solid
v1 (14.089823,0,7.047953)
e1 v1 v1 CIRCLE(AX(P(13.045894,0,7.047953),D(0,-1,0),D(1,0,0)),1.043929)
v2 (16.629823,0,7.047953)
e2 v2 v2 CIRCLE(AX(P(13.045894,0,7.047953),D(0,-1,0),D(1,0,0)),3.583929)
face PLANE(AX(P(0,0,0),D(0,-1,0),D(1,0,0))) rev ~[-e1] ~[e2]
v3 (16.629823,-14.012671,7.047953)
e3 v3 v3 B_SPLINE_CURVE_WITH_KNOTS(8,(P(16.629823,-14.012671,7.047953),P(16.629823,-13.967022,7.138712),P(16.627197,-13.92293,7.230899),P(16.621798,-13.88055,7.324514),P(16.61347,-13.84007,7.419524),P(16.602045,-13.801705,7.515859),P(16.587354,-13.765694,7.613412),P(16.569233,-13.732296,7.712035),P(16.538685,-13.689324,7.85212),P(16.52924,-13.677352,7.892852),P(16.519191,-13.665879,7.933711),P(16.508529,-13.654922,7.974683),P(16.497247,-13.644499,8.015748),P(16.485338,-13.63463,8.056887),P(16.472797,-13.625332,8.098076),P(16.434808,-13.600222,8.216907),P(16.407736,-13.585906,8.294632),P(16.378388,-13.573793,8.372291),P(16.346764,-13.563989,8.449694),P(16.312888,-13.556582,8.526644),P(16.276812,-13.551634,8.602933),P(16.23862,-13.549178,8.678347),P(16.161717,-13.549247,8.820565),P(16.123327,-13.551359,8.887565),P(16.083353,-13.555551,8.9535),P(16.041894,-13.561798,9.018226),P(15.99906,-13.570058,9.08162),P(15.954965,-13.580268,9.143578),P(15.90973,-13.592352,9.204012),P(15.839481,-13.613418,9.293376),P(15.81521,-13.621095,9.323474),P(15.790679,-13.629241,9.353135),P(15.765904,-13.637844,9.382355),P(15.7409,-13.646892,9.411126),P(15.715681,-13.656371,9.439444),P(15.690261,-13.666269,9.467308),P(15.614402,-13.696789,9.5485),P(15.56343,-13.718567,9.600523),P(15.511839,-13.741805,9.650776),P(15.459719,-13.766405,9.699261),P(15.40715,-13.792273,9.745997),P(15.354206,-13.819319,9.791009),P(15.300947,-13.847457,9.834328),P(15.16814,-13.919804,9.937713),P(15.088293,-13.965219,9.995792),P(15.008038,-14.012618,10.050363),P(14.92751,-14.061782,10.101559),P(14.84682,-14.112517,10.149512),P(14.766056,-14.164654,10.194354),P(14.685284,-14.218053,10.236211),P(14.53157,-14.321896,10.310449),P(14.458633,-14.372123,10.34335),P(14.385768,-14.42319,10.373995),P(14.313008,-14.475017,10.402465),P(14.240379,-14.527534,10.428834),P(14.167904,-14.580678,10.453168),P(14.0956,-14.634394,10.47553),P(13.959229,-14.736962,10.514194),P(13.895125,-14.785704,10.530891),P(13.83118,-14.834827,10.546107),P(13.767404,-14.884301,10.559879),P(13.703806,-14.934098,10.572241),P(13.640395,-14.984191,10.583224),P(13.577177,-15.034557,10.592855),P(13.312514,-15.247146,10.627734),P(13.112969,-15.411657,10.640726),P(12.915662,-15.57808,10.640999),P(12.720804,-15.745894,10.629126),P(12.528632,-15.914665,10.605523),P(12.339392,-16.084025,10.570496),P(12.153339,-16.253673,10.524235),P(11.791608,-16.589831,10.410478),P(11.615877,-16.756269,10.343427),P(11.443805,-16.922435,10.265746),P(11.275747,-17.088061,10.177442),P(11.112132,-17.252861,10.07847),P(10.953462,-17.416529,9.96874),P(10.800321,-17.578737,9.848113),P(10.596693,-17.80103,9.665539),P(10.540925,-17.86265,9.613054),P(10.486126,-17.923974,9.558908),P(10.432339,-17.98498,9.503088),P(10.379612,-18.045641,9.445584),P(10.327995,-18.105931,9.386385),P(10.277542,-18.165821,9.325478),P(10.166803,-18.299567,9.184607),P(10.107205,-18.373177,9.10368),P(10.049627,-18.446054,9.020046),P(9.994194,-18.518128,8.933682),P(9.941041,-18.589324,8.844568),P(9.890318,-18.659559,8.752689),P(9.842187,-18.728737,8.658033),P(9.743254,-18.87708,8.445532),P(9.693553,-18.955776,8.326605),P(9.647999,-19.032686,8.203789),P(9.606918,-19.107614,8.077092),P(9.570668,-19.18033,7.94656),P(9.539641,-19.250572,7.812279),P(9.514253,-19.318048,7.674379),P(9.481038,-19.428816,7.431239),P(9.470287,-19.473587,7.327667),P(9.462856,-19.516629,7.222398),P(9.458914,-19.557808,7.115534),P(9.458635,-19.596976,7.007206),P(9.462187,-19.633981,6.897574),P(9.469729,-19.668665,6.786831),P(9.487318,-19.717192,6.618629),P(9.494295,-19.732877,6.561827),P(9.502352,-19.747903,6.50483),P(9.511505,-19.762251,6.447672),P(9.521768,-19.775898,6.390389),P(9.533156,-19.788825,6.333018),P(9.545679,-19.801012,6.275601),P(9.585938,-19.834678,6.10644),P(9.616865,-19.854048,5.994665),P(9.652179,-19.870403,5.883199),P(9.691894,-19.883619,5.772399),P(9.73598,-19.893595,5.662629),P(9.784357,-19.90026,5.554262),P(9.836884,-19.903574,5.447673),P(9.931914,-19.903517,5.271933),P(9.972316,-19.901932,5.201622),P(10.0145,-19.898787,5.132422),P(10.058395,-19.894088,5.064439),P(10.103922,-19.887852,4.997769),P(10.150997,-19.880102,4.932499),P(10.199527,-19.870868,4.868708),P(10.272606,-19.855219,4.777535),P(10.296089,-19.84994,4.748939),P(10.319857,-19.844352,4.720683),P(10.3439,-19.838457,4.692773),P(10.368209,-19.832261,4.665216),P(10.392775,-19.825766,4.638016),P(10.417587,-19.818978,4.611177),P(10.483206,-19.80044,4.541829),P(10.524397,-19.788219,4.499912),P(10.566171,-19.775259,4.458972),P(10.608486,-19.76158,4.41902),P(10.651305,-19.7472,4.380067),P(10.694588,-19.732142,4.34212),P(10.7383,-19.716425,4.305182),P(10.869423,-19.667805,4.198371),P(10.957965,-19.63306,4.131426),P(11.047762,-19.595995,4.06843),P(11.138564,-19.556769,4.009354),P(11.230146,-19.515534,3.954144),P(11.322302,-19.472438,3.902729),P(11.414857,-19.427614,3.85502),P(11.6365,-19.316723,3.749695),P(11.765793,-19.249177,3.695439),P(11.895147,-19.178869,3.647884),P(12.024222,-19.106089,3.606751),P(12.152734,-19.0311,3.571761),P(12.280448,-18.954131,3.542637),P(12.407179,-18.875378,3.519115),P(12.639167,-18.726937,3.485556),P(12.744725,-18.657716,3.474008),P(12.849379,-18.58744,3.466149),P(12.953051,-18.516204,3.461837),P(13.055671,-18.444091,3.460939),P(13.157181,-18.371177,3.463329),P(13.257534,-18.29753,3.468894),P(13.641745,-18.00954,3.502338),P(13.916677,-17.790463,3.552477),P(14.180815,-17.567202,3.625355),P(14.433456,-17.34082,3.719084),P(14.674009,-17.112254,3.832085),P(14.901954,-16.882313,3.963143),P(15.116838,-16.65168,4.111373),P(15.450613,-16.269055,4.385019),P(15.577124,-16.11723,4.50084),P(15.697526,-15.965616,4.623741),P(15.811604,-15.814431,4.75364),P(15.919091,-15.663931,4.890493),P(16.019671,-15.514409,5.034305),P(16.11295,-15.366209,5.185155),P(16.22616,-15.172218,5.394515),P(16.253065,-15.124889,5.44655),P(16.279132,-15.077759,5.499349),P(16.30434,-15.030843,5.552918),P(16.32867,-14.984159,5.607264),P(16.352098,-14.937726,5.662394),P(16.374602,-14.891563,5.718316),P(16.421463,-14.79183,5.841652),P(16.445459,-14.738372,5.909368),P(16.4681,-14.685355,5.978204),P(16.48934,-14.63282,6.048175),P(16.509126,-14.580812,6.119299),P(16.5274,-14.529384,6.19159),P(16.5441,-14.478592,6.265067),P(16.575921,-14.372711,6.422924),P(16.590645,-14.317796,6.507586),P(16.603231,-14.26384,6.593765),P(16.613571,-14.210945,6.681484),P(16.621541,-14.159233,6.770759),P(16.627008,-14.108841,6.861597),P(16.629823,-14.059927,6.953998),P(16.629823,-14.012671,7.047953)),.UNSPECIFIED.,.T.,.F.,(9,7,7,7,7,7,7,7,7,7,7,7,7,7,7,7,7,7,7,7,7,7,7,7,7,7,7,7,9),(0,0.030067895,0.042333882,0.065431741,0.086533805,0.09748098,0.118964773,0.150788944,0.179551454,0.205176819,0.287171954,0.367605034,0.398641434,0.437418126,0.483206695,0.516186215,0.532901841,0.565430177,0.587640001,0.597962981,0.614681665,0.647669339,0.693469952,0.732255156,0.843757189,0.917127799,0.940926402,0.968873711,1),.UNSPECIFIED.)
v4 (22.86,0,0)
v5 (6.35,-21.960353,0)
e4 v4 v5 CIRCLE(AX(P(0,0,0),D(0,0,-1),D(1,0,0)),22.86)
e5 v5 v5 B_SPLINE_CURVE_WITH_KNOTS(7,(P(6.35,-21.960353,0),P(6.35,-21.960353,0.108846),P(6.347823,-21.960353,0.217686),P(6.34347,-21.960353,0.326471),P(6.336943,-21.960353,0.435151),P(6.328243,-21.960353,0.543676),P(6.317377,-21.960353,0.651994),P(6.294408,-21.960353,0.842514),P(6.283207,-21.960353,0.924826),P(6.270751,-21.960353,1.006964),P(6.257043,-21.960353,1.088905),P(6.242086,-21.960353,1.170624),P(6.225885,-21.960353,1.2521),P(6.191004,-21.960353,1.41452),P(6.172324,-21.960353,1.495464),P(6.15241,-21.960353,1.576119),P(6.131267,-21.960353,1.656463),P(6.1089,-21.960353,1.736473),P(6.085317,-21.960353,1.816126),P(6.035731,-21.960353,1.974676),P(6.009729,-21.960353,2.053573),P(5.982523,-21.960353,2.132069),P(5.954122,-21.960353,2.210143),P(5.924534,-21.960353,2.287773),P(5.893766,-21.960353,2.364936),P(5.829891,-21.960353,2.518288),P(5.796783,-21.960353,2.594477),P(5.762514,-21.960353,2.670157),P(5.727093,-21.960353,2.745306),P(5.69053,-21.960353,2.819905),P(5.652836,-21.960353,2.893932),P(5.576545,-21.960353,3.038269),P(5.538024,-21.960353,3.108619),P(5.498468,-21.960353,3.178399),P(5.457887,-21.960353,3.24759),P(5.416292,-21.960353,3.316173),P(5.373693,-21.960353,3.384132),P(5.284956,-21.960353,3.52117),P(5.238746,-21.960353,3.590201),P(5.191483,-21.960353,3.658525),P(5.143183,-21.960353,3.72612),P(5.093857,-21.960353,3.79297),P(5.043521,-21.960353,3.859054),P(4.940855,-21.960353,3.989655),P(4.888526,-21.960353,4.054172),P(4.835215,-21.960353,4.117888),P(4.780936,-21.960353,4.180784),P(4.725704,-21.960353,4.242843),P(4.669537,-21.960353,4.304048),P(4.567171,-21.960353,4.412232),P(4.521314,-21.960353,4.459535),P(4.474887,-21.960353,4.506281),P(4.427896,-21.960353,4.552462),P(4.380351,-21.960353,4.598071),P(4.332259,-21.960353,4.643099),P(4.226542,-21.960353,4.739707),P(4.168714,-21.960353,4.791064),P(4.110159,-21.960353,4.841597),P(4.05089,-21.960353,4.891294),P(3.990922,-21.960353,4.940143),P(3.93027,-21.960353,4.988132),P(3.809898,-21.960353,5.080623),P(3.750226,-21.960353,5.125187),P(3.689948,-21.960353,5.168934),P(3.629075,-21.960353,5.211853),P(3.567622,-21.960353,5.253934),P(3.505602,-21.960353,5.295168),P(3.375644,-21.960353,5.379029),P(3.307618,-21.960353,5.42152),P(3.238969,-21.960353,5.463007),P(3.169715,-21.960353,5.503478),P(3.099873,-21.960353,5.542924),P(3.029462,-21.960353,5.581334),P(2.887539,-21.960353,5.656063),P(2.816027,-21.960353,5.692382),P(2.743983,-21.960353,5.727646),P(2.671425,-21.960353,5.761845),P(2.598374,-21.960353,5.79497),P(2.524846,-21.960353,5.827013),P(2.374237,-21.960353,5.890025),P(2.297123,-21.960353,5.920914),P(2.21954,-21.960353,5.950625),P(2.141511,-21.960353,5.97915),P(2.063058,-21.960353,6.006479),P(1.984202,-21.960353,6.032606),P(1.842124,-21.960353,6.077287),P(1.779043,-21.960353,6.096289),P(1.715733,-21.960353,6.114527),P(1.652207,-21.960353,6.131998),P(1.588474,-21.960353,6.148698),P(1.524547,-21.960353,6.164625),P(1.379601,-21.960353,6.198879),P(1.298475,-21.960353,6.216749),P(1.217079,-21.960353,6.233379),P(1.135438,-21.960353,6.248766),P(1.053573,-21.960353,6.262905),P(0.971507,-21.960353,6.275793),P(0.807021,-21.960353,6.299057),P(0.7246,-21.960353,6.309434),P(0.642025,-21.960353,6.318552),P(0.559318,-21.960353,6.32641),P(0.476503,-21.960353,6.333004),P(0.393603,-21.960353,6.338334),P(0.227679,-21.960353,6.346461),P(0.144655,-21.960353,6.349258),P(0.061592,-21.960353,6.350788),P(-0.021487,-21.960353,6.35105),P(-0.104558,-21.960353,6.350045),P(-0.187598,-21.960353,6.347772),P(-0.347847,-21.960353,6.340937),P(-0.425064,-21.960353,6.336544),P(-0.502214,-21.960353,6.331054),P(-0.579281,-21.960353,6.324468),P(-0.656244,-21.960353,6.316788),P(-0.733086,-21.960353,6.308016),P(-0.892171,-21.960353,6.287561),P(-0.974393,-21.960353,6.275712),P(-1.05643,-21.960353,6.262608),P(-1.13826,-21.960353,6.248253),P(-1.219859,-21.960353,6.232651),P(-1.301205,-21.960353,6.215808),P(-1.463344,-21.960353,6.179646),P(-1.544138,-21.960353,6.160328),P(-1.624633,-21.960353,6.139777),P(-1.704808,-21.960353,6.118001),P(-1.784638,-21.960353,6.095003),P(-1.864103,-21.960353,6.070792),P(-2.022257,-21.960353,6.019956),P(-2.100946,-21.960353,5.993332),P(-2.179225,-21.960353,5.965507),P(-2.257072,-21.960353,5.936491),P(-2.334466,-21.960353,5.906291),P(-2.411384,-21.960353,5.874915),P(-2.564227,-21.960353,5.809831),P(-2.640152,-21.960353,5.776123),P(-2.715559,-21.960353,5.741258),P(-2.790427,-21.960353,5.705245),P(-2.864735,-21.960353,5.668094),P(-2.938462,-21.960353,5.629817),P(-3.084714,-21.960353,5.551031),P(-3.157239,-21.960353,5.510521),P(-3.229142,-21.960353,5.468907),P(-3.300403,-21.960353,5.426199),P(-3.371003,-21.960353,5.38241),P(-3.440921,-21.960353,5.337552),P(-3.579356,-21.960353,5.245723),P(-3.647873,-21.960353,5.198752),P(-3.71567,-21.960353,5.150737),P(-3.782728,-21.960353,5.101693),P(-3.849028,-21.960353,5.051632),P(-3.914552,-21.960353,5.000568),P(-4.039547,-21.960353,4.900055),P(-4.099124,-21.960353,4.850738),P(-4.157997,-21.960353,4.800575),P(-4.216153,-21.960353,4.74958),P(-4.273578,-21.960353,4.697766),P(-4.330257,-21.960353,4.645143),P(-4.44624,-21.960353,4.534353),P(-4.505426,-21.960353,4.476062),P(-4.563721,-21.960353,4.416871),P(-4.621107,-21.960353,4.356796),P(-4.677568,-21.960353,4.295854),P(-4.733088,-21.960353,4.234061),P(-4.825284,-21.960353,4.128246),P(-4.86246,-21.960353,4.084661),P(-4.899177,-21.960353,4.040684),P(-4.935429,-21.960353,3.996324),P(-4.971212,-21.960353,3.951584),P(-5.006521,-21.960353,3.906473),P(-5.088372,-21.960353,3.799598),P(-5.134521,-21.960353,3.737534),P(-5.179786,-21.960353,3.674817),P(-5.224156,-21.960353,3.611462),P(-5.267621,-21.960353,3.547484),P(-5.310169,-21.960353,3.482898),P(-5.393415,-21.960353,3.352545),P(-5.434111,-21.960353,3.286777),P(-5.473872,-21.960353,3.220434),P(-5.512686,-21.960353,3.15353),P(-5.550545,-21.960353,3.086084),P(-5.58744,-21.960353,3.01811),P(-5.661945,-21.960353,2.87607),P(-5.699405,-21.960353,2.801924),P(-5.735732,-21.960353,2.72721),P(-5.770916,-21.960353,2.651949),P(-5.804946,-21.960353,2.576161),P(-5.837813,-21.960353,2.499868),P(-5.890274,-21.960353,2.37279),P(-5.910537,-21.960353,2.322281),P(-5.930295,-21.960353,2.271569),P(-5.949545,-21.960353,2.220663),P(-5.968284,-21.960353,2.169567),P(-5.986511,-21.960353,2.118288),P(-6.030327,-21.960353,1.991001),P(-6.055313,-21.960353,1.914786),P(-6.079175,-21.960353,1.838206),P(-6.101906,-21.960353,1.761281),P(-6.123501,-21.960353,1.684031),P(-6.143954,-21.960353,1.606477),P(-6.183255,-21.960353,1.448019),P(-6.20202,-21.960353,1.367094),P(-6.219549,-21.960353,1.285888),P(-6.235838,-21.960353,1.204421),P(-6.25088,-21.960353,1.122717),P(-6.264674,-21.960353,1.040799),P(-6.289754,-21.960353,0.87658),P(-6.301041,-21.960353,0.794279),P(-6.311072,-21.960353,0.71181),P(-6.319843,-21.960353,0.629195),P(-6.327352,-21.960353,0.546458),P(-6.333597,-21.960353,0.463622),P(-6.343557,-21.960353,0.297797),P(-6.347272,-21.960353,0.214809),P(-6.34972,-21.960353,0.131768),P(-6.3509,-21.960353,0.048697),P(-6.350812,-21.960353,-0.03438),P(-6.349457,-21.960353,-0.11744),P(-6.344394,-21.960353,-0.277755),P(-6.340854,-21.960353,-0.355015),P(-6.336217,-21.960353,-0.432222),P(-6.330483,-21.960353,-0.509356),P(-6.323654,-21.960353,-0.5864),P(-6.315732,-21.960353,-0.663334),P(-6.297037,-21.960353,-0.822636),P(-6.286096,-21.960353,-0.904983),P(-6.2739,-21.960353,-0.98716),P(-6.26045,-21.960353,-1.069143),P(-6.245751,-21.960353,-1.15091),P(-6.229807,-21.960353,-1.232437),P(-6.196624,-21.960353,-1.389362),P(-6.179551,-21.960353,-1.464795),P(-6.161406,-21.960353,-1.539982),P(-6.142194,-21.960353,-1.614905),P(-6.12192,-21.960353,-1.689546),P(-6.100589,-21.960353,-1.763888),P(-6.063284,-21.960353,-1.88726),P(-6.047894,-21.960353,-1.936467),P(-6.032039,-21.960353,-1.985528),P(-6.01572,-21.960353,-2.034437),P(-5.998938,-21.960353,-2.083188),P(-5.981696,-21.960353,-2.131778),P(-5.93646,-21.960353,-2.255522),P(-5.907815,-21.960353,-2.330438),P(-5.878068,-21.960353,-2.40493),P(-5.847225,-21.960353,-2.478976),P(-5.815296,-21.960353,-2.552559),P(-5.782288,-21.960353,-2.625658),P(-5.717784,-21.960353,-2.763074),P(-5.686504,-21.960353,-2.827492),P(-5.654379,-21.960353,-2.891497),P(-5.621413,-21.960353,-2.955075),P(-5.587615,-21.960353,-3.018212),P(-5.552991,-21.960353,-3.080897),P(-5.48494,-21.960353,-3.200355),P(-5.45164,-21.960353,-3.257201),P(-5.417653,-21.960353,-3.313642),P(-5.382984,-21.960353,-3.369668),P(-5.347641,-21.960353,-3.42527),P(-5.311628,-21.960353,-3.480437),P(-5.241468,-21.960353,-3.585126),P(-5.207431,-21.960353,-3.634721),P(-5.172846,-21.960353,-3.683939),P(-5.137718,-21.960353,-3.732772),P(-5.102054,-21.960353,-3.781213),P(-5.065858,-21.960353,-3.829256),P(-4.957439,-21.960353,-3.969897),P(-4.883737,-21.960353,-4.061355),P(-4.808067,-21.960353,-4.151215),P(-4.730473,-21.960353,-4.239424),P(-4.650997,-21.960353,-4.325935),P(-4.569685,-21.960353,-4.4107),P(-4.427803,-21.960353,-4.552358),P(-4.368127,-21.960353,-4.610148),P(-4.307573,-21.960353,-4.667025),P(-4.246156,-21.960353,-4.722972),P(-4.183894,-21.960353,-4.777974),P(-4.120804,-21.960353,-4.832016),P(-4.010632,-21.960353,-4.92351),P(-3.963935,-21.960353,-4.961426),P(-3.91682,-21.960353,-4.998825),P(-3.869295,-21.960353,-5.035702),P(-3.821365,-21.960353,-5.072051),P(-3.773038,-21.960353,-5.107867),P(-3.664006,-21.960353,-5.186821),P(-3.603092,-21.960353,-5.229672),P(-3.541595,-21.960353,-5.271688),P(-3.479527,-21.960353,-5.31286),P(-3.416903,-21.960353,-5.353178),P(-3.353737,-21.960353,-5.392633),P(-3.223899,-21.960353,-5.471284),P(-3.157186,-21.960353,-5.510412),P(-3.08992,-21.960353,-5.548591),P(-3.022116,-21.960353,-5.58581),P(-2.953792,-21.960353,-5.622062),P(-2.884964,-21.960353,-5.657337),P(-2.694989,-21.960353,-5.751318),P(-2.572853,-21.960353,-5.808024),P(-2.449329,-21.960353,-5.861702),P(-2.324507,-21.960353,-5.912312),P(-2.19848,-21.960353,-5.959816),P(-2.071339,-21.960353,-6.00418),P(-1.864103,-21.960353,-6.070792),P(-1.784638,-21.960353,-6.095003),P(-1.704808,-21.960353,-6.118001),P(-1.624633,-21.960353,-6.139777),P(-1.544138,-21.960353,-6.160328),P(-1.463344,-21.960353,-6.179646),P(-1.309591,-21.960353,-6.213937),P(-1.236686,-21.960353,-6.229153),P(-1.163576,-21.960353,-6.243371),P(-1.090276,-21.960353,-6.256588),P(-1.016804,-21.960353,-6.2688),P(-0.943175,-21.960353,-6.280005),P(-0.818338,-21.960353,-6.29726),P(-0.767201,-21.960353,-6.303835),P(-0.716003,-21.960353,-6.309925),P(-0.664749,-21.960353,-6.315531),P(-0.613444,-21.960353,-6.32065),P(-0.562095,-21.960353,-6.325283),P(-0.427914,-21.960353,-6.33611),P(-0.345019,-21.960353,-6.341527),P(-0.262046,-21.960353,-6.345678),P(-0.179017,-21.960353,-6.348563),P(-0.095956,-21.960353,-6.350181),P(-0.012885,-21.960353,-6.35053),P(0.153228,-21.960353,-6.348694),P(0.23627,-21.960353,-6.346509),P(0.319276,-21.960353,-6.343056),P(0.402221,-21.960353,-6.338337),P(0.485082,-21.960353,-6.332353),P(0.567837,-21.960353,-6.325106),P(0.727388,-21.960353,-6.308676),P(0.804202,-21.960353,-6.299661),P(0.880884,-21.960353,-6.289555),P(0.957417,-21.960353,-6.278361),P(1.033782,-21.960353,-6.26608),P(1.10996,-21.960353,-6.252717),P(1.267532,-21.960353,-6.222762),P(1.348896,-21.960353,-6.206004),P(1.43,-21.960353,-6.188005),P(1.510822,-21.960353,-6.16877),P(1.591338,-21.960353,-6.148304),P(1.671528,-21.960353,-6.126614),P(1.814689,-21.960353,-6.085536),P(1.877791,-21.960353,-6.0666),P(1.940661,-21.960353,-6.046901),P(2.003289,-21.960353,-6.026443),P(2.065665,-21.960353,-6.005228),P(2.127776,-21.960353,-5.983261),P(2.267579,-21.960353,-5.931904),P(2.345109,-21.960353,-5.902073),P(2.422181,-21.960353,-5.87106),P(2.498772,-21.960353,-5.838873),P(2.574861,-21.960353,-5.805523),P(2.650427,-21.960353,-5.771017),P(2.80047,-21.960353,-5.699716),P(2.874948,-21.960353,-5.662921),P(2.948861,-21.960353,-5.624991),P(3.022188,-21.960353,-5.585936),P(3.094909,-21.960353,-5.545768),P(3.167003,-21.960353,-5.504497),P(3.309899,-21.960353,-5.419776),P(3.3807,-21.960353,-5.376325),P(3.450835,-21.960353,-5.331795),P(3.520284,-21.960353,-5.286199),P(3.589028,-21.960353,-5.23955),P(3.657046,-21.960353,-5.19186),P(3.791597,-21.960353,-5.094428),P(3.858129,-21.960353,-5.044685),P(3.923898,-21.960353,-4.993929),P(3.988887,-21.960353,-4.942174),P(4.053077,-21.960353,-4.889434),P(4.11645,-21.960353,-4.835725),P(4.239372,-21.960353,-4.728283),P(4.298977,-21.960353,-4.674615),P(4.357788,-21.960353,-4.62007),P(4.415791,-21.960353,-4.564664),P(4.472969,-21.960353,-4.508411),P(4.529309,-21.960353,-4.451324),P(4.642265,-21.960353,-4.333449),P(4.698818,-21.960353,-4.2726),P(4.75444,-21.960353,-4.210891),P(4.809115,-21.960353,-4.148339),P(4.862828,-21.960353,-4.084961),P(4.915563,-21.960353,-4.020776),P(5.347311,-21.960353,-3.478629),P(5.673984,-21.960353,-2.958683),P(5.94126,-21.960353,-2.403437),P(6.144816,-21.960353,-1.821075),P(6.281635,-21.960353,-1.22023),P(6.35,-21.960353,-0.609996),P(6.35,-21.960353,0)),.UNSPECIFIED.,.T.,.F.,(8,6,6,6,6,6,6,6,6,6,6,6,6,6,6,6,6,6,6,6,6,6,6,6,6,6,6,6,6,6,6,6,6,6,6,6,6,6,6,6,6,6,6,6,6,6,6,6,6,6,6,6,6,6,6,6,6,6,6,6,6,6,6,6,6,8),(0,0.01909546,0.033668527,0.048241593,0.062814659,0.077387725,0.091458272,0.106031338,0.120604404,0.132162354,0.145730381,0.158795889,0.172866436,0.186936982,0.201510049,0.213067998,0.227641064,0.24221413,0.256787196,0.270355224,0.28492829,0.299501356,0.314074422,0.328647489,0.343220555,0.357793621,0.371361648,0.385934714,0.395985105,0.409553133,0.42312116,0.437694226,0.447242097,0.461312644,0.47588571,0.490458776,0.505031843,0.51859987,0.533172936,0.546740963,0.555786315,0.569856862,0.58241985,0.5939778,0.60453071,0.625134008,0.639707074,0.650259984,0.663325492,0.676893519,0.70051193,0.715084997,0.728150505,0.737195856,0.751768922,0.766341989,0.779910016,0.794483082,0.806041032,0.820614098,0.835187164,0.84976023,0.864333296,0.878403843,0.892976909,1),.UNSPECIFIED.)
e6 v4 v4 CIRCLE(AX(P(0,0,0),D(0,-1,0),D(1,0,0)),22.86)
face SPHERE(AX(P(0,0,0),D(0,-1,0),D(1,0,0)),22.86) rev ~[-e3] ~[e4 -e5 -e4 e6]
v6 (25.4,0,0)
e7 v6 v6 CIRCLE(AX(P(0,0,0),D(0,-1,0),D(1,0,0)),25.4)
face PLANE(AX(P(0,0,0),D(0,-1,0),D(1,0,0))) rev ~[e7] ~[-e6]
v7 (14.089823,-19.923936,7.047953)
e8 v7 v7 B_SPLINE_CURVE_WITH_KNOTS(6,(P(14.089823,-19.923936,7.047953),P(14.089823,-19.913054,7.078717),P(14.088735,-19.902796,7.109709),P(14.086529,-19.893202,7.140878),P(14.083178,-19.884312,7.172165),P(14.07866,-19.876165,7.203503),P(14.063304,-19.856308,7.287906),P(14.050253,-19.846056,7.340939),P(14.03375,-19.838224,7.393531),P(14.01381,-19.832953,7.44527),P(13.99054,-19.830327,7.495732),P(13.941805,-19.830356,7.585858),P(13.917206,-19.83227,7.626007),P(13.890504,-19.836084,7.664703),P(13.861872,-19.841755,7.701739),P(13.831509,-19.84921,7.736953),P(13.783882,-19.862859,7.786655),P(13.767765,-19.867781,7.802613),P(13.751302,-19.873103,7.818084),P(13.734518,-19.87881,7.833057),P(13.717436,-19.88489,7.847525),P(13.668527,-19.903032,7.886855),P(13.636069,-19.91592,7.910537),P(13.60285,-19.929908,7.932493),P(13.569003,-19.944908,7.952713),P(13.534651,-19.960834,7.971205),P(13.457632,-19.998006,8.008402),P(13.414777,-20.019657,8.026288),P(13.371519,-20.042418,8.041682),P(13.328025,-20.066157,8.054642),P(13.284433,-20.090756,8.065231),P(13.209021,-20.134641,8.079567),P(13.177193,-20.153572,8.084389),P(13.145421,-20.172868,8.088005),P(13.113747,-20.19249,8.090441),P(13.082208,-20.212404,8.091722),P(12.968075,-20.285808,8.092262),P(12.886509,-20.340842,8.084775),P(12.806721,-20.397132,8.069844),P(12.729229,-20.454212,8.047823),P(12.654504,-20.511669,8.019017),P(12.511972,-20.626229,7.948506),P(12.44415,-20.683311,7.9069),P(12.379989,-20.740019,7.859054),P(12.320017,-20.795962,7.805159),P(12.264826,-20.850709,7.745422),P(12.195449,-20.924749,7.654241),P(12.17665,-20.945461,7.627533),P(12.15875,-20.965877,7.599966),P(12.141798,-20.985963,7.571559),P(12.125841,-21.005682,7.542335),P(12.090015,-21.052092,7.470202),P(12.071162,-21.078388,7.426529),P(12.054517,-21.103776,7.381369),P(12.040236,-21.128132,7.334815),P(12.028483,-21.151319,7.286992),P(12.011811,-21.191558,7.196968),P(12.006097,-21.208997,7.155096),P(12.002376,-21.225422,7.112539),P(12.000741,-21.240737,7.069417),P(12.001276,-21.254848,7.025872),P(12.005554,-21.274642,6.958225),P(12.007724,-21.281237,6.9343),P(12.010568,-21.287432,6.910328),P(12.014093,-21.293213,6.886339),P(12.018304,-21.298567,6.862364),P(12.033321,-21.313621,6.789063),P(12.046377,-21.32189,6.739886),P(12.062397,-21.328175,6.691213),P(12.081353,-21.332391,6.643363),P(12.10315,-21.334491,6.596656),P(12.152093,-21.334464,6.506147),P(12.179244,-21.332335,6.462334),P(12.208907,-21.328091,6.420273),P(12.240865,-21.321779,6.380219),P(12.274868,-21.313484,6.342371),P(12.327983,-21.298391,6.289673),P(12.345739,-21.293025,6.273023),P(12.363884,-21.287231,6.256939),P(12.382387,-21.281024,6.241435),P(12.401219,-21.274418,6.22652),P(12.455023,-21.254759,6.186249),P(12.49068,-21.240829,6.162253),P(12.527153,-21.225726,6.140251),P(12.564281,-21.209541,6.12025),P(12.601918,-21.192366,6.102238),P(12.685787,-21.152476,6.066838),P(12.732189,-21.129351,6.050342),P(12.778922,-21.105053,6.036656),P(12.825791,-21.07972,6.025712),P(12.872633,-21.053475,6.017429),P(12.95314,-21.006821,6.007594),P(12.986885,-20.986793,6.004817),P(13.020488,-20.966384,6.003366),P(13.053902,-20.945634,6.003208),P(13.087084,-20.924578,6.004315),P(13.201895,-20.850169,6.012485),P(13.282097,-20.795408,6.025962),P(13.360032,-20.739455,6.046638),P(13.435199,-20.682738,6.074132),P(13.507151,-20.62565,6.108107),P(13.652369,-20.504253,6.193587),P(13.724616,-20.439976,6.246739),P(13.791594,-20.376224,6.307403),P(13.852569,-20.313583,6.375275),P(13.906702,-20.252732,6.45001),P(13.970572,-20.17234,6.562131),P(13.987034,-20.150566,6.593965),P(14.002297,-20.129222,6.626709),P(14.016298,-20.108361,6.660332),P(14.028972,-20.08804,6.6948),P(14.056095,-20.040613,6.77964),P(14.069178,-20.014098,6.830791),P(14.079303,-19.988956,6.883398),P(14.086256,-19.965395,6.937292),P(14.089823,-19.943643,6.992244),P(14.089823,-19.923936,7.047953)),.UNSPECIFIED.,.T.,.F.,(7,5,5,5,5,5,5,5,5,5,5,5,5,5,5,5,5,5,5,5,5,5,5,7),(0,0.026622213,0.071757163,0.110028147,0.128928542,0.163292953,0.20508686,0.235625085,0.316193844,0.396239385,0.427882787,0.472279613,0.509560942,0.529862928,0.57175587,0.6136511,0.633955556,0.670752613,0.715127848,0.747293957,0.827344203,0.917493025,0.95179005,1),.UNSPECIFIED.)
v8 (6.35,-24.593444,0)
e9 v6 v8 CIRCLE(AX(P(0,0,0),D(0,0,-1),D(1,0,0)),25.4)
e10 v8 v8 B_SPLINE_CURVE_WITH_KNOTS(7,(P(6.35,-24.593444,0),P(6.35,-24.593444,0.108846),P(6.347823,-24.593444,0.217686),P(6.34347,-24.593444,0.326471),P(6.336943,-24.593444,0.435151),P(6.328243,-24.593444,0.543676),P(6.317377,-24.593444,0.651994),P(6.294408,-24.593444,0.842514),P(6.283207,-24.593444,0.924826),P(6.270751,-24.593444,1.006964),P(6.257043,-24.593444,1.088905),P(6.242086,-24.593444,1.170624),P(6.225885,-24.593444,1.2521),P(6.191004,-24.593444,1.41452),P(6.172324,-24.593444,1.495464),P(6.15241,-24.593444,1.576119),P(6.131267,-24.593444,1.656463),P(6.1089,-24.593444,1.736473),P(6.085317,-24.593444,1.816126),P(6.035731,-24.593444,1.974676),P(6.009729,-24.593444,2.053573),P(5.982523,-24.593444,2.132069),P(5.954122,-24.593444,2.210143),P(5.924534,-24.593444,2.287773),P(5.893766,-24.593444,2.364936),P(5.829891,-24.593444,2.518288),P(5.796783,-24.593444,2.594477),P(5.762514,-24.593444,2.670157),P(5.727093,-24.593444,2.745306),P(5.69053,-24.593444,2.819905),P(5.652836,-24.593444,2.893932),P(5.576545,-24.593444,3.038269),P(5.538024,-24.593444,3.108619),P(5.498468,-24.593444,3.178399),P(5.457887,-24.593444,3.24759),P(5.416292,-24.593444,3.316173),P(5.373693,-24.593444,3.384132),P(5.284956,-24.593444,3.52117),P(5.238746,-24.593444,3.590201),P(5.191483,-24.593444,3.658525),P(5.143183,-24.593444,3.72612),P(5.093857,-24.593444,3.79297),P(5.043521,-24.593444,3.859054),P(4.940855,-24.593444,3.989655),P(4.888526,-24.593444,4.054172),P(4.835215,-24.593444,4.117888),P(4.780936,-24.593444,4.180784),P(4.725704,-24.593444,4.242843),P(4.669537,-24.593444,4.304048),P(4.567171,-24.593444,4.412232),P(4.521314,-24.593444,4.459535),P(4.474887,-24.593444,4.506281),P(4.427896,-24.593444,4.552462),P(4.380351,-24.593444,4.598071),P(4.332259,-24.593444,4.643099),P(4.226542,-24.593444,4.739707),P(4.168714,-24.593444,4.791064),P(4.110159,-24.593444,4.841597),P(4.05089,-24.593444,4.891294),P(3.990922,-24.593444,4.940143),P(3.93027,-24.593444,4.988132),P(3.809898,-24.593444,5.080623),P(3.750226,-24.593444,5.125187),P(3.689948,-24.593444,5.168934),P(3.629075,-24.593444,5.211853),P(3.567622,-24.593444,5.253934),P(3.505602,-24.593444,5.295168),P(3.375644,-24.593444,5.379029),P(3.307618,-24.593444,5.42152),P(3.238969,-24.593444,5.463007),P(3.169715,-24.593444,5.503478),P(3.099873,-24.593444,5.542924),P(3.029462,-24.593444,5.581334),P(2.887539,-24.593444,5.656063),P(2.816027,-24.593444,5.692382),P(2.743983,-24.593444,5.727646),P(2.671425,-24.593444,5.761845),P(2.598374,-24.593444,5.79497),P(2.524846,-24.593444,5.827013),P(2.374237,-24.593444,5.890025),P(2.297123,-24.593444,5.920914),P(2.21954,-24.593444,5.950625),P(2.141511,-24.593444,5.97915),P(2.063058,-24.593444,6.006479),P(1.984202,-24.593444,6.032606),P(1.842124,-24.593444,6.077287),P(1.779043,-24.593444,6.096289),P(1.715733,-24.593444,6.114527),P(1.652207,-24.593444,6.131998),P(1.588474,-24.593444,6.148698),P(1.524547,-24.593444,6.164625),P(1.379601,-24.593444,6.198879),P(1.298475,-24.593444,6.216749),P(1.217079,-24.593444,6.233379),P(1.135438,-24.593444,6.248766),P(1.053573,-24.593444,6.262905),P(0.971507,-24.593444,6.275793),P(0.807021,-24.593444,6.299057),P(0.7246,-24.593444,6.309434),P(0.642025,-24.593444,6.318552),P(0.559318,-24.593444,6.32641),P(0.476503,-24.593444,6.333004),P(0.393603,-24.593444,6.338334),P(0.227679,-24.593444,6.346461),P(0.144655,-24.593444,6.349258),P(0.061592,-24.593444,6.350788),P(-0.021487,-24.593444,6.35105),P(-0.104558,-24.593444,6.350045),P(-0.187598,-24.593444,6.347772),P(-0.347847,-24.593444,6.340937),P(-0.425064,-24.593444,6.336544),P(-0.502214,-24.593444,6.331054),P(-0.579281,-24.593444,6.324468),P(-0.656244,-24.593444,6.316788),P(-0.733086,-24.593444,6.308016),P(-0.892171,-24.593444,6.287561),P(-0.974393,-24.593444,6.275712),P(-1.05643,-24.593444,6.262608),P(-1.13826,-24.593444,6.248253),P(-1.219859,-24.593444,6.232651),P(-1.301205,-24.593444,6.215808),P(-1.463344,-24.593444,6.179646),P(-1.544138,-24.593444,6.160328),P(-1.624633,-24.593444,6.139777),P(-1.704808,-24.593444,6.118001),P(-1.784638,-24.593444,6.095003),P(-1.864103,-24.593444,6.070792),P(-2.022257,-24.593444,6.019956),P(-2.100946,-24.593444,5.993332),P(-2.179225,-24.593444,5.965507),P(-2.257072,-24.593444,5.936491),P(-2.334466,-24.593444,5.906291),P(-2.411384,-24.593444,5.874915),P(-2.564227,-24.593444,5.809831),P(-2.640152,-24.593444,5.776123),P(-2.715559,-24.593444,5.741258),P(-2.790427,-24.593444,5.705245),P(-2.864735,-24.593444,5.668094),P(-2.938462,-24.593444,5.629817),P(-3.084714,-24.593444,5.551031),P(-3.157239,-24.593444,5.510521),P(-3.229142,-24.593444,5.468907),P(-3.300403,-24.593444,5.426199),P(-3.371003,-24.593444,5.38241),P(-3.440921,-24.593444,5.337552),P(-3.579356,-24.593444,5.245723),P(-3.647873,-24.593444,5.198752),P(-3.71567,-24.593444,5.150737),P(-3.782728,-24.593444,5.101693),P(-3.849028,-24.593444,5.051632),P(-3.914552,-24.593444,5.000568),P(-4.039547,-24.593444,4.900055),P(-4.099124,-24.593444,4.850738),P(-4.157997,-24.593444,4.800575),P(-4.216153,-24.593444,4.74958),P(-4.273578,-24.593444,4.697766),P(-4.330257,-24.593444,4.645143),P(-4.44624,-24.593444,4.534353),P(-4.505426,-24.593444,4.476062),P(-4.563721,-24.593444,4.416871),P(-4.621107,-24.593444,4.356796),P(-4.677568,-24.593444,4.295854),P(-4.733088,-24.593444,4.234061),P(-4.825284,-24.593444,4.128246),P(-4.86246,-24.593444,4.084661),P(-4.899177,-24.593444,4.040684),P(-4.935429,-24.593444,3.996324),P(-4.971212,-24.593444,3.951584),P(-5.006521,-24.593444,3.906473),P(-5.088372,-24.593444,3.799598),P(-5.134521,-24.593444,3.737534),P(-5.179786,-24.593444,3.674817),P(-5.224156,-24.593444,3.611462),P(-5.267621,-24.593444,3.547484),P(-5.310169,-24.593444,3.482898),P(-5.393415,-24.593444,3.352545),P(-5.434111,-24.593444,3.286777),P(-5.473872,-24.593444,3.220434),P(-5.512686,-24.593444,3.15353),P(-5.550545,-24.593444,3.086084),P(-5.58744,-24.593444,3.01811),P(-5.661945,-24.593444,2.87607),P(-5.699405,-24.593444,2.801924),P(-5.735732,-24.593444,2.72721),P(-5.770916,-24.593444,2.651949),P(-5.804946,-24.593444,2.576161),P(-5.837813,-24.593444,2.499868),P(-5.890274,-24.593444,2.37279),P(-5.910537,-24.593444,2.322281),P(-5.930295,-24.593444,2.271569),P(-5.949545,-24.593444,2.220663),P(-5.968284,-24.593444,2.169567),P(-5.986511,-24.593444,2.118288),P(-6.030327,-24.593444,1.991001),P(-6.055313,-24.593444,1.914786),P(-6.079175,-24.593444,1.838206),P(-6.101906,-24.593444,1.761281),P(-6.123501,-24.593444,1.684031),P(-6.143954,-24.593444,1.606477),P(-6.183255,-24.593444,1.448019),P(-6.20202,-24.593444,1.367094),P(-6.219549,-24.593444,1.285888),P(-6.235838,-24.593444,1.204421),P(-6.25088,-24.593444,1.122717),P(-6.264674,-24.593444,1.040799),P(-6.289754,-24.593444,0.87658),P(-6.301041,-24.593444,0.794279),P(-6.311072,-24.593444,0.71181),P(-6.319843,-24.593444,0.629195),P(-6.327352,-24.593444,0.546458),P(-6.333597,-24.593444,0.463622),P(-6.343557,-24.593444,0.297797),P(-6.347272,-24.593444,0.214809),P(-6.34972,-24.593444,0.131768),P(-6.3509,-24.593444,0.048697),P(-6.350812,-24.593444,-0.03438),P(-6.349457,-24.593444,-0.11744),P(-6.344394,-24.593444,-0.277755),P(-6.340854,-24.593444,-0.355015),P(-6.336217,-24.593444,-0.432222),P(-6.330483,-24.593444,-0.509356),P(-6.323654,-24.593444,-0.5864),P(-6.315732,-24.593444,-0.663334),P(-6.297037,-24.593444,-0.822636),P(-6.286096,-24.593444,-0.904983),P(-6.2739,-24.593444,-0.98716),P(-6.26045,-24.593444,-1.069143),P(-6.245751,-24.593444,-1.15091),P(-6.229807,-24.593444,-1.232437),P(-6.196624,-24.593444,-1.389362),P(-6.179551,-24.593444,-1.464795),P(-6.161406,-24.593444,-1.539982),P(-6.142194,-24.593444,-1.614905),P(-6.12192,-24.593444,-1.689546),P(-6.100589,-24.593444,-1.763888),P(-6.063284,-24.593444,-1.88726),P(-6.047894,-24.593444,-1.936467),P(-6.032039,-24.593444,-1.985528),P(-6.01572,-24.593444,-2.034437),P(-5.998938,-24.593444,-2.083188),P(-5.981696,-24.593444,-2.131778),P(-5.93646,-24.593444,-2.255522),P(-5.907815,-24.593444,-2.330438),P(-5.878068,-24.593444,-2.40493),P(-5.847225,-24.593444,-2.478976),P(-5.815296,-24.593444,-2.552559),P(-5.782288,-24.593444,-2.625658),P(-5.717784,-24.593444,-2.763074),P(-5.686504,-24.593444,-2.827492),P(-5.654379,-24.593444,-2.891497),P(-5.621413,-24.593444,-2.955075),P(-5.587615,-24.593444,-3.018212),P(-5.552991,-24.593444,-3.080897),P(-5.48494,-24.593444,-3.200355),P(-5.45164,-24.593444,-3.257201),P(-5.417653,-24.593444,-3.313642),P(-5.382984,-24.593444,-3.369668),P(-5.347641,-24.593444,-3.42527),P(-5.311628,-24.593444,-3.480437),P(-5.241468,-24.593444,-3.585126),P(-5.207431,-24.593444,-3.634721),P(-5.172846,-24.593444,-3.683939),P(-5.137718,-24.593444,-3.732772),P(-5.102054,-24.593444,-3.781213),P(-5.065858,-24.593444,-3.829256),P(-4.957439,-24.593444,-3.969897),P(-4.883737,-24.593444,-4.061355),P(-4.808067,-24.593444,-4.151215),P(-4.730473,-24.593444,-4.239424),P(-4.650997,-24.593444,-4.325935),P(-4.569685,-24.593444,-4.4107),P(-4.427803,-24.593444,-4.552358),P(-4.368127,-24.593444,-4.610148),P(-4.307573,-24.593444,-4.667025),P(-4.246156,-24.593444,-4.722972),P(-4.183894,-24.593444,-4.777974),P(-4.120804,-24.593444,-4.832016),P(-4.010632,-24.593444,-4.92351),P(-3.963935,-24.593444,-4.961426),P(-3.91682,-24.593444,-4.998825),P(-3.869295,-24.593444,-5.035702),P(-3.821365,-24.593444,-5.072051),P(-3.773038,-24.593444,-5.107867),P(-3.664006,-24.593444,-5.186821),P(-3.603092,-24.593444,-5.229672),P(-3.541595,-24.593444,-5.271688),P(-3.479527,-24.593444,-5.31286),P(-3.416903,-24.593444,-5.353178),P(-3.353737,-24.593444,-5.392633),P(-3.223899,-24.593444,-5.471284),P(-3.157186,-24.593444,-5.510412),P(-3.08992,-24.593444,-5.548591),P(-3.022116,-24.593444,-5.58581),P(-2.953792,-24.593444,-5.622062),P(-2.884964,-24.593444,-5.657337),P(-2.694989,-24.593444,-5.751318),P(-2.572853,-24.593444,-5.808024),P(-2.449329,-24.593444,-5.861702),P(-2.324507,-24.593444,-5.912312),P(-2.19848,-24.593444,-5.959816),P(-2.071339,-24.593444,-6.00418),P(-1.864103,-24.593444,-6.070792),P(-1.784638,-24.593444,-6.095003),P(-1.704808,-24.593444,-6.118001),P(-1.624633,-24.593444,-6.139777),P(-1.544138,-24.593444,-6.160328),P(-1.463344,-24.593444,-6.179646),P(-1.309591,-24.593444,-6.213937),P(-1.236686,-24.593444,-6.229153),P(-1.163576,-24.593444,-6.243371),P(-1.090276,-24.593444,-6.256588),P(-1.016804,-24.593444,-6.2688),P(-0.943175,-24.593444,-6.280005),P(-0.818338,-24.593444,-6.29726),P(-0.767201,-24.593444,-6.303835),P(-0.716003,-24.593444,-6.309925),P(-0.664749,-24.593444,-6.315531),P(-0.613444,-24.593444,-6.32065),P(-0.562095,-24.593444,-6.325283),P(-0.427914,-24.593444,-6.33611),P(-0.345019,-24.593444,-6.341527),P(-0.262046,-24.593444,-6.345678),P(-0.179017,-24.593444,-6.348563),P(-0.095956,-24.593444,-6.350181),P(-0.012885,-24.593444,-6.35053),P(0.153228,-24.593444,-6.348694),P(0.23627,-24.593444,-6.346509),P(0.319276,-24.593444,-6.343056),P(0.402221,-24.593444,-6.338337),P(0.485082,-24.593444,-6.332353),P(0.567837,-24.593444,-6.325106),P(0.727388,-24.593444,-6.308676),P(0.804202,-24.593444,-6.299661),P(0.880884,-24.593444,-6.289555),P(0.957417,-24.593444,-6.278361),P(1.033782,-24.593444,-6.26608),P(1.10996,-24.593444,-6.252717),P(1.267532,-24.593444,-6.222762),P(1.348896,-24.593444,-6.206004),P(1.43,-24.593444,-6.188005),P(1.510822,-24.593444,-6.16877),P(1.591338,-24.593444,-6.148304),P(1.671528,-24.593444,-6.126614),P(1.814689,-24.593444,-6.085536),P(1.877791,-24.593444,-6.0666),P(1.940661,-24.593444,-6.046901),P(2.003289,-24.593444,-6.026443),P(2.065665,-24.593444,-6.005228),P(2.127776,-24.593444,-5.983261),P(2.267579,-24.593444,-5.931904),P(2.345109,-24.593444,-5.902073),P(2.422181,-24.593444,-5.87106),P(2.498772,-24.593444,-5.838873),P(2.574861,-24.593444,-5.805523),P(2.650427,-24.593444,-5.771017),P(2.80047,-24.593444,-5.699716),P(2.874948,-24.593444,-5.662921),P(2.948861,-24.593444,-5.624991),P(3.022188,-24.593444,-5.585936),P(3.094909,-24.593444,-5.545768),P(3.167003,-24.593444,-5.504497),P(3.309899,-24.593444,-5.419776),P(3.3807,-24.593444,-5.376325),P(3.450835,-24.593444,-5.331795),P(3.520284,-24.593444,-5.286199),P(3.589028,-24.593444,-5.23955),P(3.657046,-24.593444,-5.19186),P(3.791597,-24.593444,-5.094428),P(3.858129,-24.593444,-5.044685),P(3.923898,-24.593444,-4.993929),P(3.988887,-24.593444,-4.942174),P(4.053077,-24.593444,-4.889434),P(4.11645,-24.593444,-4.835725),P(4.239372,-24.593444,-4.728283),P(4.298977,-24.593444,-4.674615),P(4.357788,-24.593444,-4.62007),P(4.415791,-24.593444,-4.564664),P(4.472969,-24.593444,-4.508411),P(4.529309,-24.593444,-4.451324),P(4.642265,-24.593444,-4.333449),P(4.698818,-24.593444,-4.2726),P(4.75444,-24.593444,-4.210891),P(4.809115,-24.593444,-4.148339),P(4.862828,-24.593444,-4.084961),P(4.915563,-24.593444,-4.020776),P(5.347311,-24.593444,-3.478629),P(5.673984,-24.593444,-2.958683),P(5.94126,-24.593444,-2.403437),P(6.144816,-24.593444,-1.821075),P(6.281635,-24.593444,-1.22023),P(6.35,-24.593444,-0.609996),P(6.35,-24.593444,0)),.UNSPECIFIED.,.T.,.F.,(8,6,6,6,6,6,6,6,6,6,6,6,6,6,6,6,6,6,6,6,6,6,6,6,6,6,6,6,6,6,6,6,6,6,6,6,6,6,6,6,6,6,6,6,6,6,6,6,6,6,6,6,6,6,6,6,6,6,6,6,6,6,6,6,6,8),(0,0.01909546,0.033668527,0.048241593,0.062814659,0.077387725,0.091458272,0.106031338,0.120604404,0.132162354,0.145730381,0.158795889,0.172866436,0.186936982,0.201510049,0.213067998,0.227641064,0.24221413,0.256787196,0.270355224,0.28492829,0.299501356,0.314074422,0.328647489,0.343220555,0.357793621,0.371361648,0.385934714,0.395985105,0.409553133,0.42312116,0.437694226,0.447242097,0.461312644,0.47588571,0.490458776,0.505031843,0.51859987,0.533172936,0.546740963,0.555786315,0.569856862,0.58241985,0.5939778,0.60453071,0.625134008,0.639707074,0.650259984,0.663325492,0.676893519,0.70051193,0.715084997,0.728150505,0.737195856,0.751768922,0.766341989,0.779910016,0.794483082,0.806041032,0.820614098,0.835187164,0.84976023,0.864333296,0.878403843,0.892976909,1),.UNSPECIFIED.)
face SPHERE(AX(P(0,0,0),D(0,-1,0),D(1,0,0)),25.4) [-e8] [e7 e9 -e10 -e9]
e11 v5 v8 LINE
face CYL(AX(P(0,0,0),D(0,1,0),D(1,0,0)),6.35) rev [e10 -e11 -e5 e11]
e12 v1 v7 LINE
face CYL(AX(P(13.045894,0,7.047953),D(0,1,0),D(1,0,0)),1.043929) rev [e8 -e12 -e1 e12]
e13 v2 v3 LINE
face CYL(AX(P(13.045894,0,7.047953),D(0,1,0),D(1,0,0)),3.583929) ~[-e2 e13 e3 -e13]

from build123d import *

# Parameters (mm, degrees)
F0_R     = 25.4
F0_R_2   = 1.0439291231
F1_DEPTH = 25.4
F3_T     = -2.54
F4_R     = 6.35
F5_DEPTH = 50.8


# Not quite as in the source:
# - a fillet or chamfer that OpenCascade refuses, or shapes differently, is made with other operations: its cross-section is extruded or revolved along the edge and cut away or added


with BuildPart() as f1:
    # F0 (on Front) → F1 (new body)
    with BuildSketch(Plane.XZ):
        Circle(F0_R)
        with Locations((13.0458941537, 7.0479529987)):
            Circle(F0_R_2, mode=Mode.SUBTRACT)
    extrude(amount=F1_DEPTH)

    # F2: fillet of radius 25.4 on 1 edges, made by hand

    # F2_s1 → F2_t2 (revolve, cut)
    with BuildSketch(Plane.XY):
        with BuildLine():
            ThreePointArc((25.4, 0), (17.9605122421, -17.9605122421), (0, -25.4))
            Line((0, -25.4), (25.4, -25.4))
            Line((25.4, -25.4), (25.4, 0))
        make_face()
    revolve(axis=Axis((0, -25.4, 0), (0, -1, 0)), mode=Mode.SUBTRACT)

    # F3
    f3_openings = [f1.faces().sort_by_distance(p)[0] for p in [
        (-0.022074, 0, -0.011925),
    ]]
    offset(amount=F3_T, openings=f3_openings)

    # F4 (on Front) → F5 (cut)
    with BuildSketch(Plane.XZ):
        Circle(F4_R)
    extrude(amount=F5_DEPTH, mode=Mode.SUBTRACT)


solid = f1.part
